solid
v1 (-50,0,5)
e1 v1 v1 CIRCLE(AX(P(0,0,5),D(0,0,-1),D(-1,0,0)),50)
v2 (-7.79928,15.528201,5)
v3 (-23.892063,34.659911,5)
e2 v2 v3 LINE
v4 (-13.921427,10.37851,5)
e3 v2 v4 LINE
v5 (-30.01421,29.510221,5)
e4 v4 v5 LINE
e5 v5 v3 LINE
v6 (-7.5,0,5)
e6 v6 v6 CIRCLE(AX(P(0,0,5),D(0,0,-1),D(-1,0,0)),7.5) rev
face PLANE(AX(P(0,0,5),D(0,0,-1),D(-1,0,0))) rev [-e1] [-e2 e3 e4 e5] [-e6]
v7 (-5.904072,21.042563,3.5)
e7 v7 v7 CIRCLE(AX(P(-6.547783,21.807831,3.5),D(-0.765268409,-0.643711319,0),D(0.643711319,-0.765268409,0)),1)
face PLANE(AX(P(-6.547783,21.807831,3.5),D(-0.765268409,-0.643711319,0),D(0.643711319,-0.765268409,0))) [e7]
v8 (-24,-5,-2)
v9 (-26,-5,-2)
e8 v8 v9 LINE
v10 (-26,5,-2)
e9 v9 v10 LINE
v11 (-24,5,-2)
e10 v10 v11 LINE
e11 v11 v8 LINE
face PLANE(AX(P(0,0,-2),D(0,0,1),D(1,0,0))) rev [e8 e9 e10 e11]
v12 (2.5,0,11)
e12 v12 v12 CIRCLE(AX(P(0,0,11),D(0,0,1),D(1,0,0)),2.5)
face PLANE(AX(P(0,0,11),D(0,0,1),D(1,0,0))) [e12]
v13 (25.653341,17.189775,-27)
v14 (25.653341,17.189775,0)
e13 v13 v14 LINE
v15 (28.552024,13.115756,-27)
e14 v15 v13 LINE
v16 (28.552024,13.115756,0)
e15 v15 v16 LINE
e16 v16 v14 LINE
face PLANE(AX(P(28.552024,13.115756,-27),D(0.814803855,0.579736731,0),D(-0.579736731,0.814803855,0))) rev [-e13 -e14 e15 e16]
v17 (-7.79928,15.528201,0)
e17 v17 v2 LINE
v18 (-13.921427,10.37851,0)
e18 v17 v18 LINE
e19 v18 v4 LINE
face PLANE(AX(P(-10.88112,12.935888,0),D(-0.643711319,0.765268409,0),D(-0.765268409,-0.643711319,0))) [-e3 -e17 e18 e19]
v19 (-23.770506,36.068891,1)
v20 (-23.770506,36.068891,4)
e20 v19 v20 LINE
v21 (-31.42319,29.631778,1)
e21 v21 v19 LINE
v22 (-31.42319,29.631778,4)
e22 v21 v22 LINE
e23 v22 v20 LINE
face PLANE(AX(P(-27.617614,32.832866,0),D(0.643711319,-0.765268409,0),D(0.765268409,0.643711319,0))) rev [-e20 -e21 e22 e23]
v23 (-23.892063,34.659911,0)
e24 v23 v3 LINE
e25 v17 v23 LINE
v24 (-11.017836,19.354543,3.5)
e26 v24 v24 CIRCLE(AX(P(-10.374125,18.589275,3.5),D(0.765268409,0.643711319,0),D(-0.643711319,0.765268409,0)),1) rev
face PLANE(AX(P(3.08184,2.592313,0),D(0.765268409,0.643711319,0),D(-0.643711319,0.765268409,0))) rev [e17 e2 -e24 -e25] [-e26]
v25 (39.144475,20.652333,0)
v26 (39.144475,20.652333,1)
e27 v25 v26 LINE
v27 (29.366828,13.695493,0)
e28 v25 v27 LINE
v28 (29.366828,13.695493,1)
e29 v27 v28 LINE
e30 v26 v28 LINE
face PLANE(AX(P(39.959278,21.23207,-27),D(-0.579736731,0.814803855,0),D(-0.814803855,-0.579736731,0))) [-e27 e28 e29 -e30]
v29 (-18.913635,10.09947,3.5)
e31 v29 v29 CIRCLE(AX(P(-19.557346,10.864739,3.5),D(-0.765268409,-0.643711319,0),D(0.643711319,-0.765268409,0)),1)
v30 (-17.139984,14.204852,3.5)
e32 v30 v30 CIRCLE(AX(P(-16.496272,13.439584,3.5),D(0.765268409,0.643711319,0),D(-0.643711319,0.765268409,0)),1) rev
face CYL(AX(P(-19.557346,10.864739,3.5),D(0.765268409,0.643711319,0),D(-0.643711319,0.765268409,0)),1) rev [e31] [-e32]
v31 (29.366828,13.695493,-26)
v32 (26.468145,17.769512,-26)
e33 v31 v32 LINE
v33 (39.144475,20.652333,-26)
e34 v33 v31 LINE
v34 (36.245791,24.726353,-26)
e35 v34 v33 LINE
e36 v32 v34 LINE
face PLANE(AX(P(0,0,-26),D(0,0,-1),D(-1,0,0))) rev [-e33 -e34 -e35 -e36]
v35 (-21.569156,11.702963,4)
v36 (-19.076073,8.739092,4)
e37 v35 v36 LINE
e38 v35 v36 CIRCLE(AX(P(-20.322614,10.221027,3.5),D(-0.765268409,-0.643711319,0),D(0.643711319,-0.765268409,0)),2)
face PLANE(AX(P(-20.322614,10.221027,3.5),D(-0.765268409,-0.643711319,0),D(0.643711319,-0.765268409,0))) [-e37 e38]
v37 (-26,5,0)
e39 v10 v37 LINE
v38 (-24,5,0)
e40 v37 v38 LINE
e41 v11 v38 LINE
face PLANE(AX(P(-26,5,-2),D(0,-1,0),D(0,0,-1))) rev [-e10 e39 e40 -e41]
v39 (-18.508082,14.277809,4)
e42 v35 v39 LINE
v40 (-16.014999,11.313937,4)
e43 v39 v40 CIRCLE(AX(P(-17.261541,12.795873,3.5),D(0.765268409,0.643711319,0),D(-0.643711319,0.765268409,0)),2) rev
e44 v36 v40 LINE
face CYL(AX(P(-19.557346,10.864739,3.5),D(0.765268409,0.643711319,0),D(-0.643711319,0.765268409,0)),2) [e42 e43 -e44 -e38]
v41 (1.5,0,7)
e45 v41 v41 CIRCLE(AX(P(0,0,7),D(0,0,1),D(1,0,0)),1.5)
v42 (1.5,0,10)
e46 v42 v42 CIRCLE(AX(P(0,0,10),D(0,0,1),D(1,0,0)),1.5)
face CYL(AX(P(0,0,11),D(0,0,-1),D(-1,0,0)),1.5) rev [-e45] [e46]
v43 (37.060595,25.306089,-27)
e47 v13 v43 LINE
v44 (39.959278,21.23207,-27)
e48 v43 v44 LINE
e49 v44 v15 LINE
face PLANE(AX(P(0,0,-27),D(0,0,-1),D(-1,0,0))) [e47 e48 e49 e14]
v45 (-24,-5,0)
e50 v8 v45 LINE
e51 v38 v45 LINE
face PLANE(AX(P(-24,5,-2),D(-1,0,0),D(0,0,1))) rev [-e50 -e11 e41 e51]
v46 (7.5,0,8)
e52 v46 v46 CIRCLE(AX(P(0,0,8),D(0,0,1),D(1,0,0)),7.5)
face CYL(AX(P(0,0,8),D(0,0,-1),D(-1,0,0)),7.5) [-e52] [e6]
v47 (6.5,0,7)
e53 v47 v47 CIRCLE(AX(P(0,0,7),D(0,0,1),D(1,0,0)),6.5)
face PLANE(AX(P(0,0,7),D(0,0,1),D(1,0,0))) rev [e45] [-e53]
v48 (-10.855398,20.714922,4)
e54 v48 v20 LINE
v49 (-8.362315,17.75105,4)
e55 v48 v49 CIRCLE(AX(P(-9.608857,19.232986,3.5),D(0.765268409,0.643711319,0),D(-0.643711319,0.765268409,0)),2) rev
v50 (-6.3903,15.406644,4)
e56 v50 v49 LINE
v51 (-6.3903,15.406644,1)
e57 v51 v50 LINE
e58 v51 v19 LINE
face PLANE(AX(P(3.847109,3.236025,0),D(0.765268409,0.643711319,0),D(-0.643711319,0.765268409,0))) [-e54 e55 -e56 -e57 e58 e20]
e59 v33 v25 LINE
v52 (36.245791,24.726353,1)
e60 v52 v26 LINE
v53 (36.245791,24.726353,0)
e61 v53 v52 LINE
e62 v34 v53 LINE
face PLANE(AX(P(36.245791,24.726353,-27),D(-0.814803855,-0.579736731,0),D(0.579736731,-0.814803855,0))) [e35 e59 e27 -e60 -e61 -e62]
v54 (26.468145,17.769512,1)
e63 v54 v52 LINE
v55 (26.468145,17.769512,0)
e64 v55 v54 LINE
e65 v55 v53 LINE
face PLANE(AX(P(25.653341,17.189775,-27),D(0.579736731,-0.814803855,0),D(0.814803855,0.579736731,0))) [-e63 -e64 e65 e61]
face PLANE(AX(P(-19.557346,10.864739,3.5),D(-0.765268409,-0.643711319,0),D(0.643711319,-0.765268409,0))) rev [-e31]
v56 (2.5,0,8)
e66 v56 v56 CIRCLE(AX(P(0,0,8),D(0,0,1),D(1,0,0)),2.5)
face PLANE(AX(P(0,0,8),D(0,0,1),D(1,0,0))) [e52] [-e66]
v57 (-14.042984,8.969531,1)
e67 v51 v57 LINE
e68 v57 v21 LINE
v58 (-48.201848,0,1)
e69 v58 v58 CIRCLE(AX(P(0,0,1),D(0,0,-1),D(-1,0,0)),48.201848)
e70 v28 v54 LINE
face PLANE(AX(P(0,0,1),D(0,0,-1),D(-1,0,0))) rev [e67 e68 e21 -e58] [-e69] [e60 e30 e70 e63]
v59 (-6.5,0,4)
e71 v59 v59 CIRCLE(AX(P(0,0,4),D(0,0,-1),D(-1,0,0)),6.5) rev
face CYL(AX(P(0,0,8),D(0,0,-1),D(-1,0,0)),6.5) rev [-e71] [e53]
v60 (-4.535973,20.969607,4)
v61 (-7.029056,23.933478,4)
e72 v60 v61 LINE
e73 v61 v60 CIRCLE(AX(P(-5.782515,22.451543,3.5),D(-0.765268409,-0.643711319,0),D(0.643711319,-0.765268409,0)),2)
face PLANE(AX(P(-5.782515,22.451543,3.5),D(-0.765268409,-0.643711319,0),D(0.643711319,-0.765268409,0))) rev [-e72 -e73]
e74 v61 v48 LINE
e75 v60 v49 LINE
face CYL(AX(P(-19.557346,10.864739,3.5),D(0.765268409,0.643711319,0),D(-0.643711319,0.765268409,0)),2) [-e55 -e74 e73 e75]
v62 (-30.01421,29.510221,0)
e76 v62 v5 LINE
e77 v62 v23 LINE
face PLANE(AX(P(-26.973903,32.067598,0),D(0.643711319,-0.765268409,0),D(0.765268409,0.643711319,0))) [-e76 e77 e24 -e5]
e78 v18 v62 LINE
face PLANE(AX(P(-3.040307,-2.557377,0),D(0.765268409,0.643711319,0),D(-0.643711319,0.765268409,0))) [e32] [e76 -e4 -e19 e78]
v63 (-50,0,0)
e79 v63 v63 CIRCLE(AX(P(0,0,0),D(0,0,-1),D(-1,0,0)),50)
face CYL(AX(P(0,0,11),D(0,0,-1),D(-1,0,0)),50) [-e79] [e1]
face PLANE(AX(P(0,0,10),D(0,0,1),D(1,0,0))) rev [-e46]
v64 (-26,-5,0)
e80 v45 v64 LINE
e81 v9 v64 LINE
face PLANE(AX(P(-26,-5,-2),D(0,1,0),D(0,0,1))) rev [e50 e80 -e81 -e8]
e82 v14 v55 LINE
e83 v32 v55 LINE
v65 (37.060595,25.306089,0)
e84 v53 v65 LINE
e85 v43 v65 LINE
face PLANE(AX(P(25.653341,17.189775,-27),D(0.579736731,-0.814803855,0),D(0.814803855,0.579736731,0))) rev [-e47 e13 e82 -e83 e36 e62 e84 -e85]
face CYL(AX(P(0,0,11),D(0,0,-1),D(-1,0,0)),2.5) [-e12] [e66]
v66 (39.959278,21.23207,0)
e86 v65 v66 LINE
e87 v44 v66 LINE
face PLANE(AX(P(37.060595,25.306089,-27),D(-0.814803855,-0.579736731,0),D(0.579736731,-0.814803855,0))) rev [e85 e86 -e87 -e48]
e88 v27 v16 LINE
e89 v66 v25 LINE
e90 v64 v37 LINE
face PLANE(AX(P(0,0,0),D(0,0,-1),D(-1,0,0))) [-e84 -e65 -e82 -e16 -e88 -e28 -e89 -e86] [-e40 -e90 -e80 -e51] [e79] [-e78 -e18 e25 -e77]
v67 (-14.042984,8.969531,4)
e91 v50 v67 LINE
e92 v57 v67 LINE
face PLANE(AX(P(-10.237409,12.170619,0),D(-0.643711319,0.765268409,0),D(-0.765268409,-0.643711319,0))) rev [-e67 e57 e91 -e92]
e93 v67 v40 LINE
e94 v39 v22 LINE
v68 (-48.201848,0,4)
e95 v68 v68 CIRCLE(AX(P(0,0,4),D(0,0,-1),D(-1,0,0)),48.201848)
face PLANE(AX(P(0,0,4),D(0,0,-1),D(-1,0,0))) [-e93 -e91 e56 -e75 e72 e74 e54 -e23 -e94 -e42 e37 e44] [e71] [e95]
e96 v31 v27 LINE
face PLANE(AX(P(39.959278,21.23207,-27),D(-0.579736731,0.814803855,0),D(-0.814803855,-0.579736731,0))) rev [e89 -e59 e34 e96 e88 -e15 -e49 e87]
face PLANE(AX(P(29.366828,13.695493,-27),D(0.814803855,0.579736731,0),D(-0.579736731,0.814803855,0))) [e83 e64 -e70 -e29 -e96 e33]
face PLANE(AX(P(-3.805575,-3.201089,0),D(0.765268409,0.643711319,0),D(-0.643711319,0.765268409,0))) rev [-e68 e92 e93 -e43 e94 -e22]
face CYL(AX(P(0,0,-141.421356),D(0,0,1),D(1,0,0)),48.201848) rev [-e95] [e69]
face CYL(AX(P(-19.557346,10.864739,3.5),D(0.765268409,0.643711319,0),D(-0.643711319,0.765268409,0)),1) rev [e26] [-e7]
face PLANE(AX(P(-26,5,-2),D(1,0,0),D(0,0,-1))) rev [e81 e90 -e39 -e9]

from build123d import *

# Parameters (mm, degrees)
SKETCH1_W               = 100
SKETCH1_H               = 100
BOSS_EXTRUDE1_DEPTH     = 5
SKETCH2_R               = 7.5
BOSS_EXTRUDE2_DEPTH     = 3
SKETCH3_R               = 2.5
BOSS_EXTRUDE3_DEPTH     = 3
CUT_EXTRUDE1_DEPTH      = 71.964779997
CUT_EXTRUDE2_DEPTH      = 12
CUT_EXTRUDE2_DEPTH_BACK = 5
SKETCH11_R              = 1
BOSS_EXTRUDE5_DEPTH     = 27
SHELL1_START            = 5.027136377
SHELL1_DEPTH            = 5
SHELL1_START_2          = -8.972863623
SHELL1_2_DEPTH          = 4
SHELL1_START_3          = 10.027136377
SHELL1_3_DEPTH          = 34.623982156
SHELL1_START_4          = 43.654391787
SHELL1_4_DEPTH          = 0.996726746
SHELL1_START_5          = 30.292722796
SHELL1_5_DEPTH          = 0.404221296
SHELL1_START_6          = 1
SHELL1_6_DEPTH          = 3
SHELL1_START_7          = -26
SHELL1_7_DEPTH          = 27
SHELL1_START_8          = 4
SHELL1_8_OUTLINE_R      = 6.5
SHELL1_8_DEPTH          = 3
SHELL1_START_9          = 7
SHELL1_9_OUTLINE_R      = 1.5
SHELL1_9_DEPTH          = 3
SHELL1_10_DEPTH         = 3
SKETCH14_W              = 105.332153784
SKETCH14_H              = 107.039050792
SKETCH14_R              = 50
CUT_EXTRUDE3_DEPTH      = 76.690157881
BOSS_EXTRUDE6_START     = -5
SKETCH15_R              = 50
SKETCH15_R_2            = 48.20184761
BOSS_EXTRUDE6_DEPTH     = 5
SKETCH16_W              = 2
SKETCH16_H              = 10
BOSS_EXTRUDE7_DEPTH     = 2


with BuildPart() as part:
    # Sketch1 → Boss-Extrude1 (new body)
    with BuildSketch(Plane.XY):
        Rectangle(SKETCH1_W, SKETCH1_H)
    extrude(amount=BOSS_EXTRUDE1_DEPTH)

    # Sketch2 → Boss-Extrude2 (add)
    with BuildSketch(Plane.XY.offset(5)):
        with Locations(Location((0, 0, 0), (0, 0, 180))):
            Circle(SKETCH2_R)
    extrude(amount=BOSS_EXTRUDE2_DEPTH)

    # Sketch3 → Boss-Extrude3 (add)
    with BuildSketch(Plane.XY.offset(8)):
        Circle(SKETCH3_R)
    extrude(amount=BOSS_EXTRUDE3_DEPTH)

    # Sketch10 → Cut-Extrude1 (cut, through all)
    with BuildSketch(Plane.XY.offset(5)):
        Polygon((-7.799279723, 15.528201009), (-13.921426992, 10.378510454), (-30.014209976, 29.510220671), (-23.892062707, 34.659911226), align=None)
    extrude(amount=-CUT_EXTRUDE1_DEPTH, mode=Mode.SUBTRACT)

    # Sketch11 → Cut-Extrude2 (cut, two sides: drawn at the far end of the back side and taken through both)
    with BuildSketch(Plane(origin=(3.081840247, 2.592313271, 0), x_dir=(0, 0, 1), z_dir=(-0.765268408666043, -0.6437113193798463, 0)).offset(-CUT_EXTRUDE2_DEPTH_BACK)):
        with Locations(Location((3.5, 20.903726316, 0), (0, 0, 90))):
            Circle(SKETCH11_R)
    extrude(amount=CUT_EXTRUDE2_DEPTH + CUT_EXTRUDE2_DEPTH_BACK, mode=Mode.SUBTRACT)

    # Sketch13 → Boss-Extrude5 (add)
    with BuildSketch(Plane(origin=(0, 0, 0), x_dir=(-1, 0, 0), z_dir=(0, 0, -1))):
        Polygon((-25.653340805, 17.18977508), (-37.06059478, 25.306089315), (-39.959278435, 21.232070039), (-28.552024461, 13.115755803), align=None)
    extrude(amount=BOSS_EXTRUDE5_DEPTH)

    # Shell1: read off the stored shape, not the designer's step
    # Shell1 outline → Shell1 (cut)
    with BuildSketch(Plane(origin=(0, 0, 0), x_dir=(0.6437113193798459, -0.7652684086660432, 0), z_dir=(0.7652684086660431, 0.6437113193798462, 0)).offset(SHELL1_START)):
        with BuildLine():
            Line((-18.967234643, -4), (-15.903726316, -4))
            Line((-15.903726316, -4), (-15.903726316, -1))
            Line((-15.903726316, -1), (-42.903726316, -1))
            Line((-42.903726316, -1), (-42.903726316, -4))
            Line((-42.903726316, -4), (-22.840217989, -4))
            ThreePointArc((-22.840217989, -4), (-20.903726316, -1.5), (-18.967234643, -4))
        make_face()
    extrude(amount=SHELL1_DEPTH, mode=Mode.SUBTRACT)

    # Shell1 2 outline → Shell1 2 (cut)
    with BuildSketch(Plane(origin=(0, 0, 0), x_dir=(0.6437113193798459, -0.7652684086660432, 0), z_dir=(0.7652684086660431, 0.6437113193798462, 0)).offset(SHELL1_START_2)):
        with BuildLine():
            Line((-18.967234643, -4), (-15.903726316, -4))
            Line((-15.903726316, -4), (-15.903726316, -1))
            Line((-15.903726316, -1), (-42.903726316, -1))
            Line((-42.903726316, -1), (-42.903726316, -4))
            Line((-42.903726316, -4), (-22.840217989, -4))
            ThreePointArc((-22.840217989, -4), (-20.903726316, -1.5), (-18.967234643, -4))
        make_face()
    extrude(amount=SHELL1_2_DEPTH, mode=Mode.SUBTRACT)

    # Shell1 3 outline → Shell1 3 (cut)
    with BuildSketch(Plane(origin=(0, 0, 0), x_dir=(0.6437113193798459, -0.7652684086660432, 0), z_dir=(0.7652684086660431, 0.6437113193798462, 0)).offset(SHELL1_START_3)):
        with BuildLine():
            Line((-22.840217989, -4), (-18.967234643, -4))
            ThreePointArc((-18.967234643, -4), (-20.903726316, -1.5), (-22.840217989, -4))
        make_face()
    extrude(amount=SHELL1_3_DEPTH, mode=Mode.SUBTRACT)

    # Shell1 4 outline → Shell1 4 (cut)
    with BuildSketch(Plane(origin=(0, 0, 0), x_dir=(0.6437113193798459, -0.7652684086660432, 0), z_dir=(0.7652684086660431, 0.6437113193798462, 0)).offset(SHELL1_START_4)):
        with BuildLine():
            Line((-18.967234643, -4), (-15.903726316, -4))
            Line((-15.903726316, -4), (-15.903726316, -1))
            Line((-15.903726316, -1), (-42.903726316, -1))
            Line((-42.903726316, -1), (-42.903726316, -4))
            Line((-42.903726316, -4), (-22.840217989, -4))
            ThreePointArc((-22.840217989, -4), (-20.903726316, -1.5), (-18.967234643, -4))
        make_face()
    extrude(amount=SHELL1_4_DEPTH, mode=Mode.SUBTRACT)

    # Shell1 5 outline → Shell1 5 (cut)
    with BuildSketch(Plane(origin=(0, 0, 0), x_dir=(0.6437113193798459, -0.7652684086660432, 0), z_dir=(0.7652684086660431, 0.6437113193798462, 0)).offset(SHELL1_START_5)):
        with BuildLine():
            Line((-18.967234643, -4), (-15.903726316, -4))
            Line((-15.903726316, -4), (-15.903726316, -1))
            Line((-15.903726316, -1), (-42.903726316, -1))
            Line((-42.903726316, -1), (-42.903726316, -4))
            Line((-42.903726316, -4), (-22.840217989, -4))
            ThreePointArc((-22.840217989, -4), (-20.903726316, -1.5), (-18.967234643, -4))
        make_face()
    extrude(amount=SHELL1_5_DEPTH, mode=Mode.SUBTRACT)

    # Shell1 6 outline → Shell1 6 (cut)
    with BuildSketch(Plane.XY.offset(SHELL1_START_6)):
        Polygon((49, -49), (49, 49), (17.13028231, 49), (23.932681775, 40.913049752), (23.169918284, 40.271445464), (15.827828511, 49), (-1.10407087, 49), (13.253992906, 31.930589712), (12.944655118, 31.670387888), (-1.632279393, 49), (-49, 49), (-49, -49), align=None)
        Polygon((-2.563957951, 18.625200517), (-6.390299995, 15.40664392), (-14.042984081, 8.969530726), (-17.104057716, 6.394685448), (-19.035191674, 8.690490674), (-21.610036952, 11.751564309), (-34.484263339, 27.056932482), (-31.423189704, 29.63177776), (-23.770505618, 36.068890954), (-19.944163574, 39.287447551), align=None, mode=Mode.SUBTRACT)
    extrude(amount=SHELL1_6_DEPTH, mode=Mode.SUBTRACT)

    # Shell1 7 outline → Shell1 7 (cut)
    with BuildSketch(Plane.XY.offset(SHELL1_START_7)):
        Polygon((36.245790924, 24.726352584), (26.46814466, 17.769511811), (29.366828316, 13.695492535), (39.14447458, 20.652333308), align=None)
    extrude(amount=SHELL1_7_DEPTH, mode=Mode.SUBTRACT)

    # Shell1 8 outline → Shell1 8 (cut)
    with BuildSketch(Plane.XY.offset(SHELL1_START_8)):
        Circle(SHELL1_8_OUTLINE_R)
    extrude(amount=SHELL1_8_DEPTH, mode=Mode.SUBTRACT)

    # Shell1 9 outline → Shell1 9 (cut)
    with BuildSketch(Plane.XY.offset(SHELL1_START_9)):
        Circle(SHELL1_9_OUTLINE_R)
    extrude(amount=SHELL1_9_DEPTH, mode=Mode.SUBTRACT)

    # Shell1 10 outline → Shell1 10 (add)
    with BuildSketch(Plane.XY.offset(SHELL1_START_6)):
        Polygon((15.827828511, 49), (17.13028231, 49), (16.289124734, 50), (14.986670935, 50), align=None)
        Polygon((-1.632279393, 49), (-1.10407087, 49), (-1.945228446, 50), (-2.473436969, 50), align=None)
    extrude(amount=SHELL1_10_DEPTH)

    # Sketch14 → Cut-Extrude3 (cut, through all)
    with BuildSketch(Plane(origin=(0, 0, 0), x_dir=(-1, 0, 0), z_dir=(0, 0, -1))):
        Rectangle(SKETCH14_W, SKETCH14_H)
        Circle(SKETCH14_R, mode=Mode.SUBTRACT)
    extrude(amount=-CUT_EXTRUDE3_DEPTH, mode=Mode.SUBTRACT)

    # Sketch15 → Boss-Extrude6 (add)
    with BuildSketch(Plane.XY.offset(5).offset(BOSS_EXTRUDE6_START)):
        with Locations(Location((0, 0, 0), (0, 0, 180))):
            Circle(SKETCH15_R)
        with Locations(Location((0, 0, 0), (0, 0, 180))):
            Circle(SKETCH15_R_2, mode=Mode.SUBTRACT)
    extrude(amount=BOSS_EXTRUDE6_DEPTH)

    # Sketch16 → Boss-Extrude7 (add)
    with BuildSketch(Plane(origin=(0, 0, 0), x_dir=(-1, 0, 0), z_dir=(0, 0, -1))):
        with Locations((25, 0)):
            Rectangle(SKETCH16_W, SKETCH16_H)
    extrude(amount=BOSS_EXTRUDE7_DEPTH)


solid = part.part
